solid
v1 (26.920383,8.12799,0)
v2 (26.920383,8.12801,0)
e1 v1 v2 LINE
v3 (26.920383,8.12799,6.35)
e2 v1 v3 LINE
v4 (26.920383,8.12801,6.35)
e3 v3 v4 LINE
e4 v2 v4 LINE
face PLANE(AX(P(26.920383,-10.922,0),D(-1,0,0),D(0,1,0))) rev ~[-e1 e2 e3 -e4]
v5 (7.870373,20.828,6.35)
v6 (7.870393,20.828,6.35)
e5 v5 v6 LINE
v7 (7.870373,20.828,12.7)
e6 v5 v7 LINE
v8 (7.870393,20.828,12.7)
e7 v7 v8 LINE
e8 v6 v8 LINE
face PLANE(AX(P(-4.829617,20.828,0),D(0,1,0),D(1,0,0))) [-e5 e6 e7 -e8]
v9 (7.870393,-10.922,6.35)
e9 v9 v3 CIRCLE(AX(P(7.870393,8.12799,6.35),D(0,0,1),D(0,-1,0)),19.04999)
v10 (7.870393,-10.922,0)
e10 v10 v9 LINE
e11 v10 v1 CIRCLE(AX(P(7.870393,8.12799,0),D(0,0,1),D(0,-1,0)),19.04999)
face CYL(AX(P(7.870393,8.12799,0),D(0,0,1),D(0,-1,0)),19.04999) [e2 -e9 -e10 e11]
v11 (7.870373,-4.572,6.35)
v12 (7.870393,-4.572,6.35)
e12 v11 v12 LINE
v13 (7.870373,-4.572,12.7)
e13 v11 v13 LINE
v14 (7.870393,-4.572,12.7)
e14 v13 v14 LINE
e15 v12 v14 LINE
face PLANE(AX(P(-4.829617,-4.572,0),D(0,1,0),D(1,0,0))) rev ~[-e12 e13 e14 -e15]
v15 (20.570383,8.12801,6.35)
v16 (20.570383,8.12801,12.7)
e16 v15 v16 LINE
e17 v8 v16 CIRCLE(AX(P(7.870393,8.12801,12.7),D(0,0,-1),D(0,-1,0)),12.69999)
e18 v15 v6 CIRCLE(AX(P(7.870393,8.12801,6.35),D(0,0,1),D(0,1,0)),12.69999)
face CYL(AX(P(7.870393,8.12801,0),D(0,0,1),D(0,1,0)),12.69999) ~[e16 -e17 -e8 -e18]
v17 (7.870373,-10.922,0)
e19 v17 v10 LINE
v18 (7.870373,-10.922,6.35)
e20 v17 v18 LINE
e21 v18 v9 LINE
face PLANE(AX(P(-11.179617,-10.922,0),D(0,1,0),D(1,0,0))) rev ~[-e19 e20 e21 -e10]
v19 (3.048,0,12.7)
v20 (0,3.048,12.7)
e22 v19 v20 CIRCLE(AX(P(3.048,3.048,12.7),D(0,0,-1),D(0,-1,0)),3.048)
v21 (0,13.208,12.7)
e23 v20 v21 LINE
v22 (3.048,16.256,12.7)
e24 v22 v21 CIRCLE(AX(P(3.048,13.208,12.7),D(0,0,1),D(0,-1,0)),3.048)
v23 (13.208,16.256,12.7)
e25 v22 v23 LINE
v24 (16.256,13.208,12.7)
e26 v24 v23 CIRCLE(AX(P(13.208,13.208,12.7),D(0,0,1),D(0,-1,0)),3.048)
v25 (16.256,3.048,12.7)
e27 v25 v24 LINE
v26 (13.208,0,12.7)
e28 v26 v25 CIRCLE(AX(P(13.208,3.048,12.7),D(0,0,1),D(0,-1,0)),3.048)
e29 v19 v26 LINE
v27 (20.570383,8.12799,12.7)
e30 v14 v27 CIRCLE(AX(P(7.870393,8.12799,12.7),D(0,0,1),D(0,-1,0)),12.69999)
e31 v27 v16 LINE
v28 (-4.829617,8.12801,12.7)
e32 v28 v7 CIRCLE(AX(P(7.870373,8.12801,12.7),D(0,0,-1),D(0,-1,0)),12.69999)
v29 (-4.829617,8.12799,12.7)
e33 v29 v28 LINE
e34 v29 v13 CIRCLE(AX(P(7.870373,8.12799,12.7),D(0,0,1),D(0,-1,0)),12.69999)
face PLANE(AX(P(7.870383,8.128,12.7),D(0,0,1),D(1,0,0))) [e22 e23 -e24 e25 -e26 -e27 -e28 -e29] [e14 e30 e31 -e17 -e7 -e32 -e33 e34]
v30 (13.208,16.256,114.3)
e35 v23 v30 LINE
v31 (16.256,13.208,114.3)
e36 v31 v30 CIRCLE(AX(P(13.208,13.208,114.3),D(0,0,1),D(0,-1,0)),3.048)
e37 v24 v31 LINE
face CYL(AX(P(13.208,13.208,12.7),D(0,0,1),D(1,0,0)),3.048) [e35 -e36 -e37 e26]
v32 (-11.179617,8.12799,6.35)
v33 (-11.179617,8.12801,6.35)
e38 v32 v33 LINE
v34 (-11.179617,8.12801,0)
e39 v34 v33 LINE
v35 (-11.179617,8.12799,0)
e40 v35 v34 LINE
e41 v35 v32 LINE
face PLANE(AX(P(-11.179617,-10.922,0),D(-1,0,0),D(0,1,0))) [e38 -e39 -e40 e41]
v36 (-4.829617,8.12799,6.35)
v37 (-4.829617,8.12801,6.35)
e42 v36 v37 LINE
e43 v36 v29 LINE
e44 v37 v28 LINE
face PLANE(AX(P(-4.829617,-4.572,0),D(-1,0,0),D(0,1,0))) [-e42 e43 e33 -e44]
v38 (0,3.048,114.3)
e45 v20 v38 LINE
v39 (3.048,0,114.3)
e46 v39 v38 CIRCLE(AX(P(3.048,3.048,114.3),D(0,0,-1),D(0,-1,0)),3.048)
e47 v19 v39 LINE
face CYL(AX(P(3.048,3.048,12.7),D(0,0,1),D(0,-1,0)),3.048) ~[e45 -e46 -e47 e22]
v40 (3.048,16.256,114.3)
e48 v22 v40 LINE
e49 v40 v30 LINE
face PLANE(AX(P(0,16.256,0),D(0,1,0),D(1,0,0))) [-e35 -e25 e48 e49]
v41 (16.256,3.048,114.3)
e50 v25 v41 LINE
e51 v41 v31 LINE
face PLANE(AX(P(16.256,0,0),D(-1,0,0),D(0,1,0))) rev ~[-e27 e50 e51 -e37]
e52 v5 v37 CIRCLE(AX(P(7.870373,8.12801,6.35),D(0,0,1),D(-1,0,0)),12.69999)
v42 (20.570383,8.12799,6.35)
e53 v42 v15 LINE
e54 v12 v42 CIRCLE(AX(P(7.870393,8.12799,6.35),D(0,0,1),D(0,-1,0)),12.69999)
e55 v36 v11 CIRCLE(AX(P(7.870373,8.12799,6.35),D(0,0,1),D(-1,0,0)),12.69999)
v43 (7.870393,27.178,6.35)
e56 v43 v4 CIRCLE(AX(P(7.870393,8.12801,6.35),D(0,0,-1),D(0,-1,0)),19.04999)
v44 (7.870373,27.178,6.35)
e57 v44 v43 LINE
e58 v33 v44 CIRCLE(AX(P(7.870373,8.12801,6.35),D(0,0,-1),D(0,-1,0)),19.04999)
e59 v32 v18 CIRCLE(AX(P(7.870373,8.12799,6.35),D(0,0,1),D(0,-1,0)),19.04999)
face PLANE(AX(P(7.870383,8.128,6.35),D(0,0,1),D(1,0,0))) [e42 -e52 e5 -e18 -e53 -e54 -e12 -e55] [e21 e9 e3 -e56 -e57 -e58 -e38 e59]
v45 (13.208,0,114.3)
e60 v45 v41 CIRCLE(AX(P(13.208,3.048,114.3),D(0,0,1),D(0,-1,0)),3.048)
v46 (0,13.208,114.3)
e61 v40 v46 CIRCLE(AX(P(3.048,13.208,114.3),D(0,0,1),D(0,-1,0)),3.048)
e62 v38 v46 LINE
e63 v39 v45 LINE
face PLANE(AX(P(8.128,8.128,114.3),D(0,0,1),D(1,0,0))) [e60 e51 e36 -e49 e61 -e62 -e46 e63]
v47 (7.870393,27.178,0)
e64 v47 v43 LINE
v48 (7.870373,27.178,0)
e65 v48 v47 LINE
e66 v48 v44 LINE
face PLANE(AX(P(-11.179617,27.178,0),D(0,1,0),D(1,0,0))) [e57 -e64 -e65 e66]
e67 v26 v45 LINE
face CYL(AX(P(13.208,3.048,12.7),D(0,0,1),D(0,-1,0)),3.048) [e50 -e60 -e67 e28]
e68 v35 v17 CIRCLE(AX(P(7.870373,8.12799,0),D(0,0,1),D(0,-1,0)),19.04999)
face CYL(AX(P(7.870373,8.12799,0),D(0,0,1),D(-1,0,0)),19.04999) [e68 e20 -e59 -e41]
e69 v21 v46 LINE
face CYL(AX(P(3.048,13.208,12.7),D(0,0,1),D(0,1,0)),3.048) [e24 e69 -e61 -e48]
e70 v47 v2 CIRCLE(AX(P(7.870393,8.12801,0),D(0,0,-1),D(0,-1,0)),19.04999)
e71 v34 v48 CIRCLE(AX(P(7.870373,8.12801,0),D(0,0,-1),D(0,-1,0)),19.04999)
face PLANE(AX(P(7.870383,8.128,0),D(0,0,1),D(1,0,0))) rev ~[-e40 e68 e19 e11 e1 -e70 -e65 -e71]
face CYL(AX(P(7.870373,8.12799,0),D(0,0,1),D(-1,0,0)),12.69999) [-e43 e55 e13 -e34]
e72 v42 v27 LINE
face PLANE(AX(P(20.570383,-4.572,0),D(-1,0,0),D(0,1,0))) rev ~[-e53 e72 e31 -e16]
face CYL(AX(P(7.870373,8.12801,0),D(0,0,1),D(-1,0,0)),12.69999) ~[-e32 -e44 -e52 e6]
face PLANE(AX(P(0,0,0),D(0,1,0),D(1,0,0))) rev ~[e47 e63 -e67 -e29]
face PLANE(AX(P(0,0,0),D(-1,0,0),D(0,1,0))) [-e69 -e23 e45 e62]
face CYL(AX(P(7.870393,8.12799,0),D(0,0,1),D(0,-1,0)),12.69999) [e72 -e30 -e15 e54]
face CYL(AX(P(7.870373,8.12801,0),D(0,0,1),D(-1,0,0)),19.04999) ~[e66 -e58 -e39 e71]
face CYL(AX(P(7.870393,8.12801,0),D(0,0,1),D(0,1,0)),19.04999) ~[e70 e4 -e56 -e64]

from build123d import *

# Parameters (mm, degrees)
F0_W     = 16.256
F0_H     = 16.256
F1_DEPTH = 114.3
F0_W_2   = 25.4
F0_H_2   = 25.4
F2_DEPTH = 12.7
F3_R     = 3.048
F4_R     = 12.69999
F0_W_3   = 38.1
F0_H_3   = 38.1
F5_DEPTH = 6.35
F6_R     = 19.04999


# Not quite as in the source:
# - a fillet or chamfer is up to 0.001 mm smaller than in the source, because OpenCascade refuses the exact size


with BuildPart() as f1:
    # F0 (on Top) → F1 (new body)
    with BuildSketch(Plane.XY):
        with Locations((8.128, 8.128)):
            Rectangle(F0_W, F0_H)
    extrude(amount=F1_DEPTH)

    # F0 (on Top) → F2 (join)
    with BuildSketch(Plane.XY):
        with Locations((7.8703831056, 8.128)):
            Rectangle(F0_W_2, F0_H_2)
        with Locations((8.128, 8.128)):
            Rectangle(F0_W, F0_H, mode=Mode.SUBTRACT)
    extrude(amount=F2_DEPTH)

    # F3
    f3_edges = [f1.edges().sort_by_distance(p)[0] for p in [
        (0, 16.256, 63.5),
        (16.256, 16.256, 63.5),
        (16.256, 0, 63.5),
        (0, 0, 63.5),
    ]]
    fillet(f3_edges, radius=F3_R)

    # F4 (radius 12.7 in the source; OpenCascade refuses exactly that, so slightly less here)
    f4_edges = [f1.edges().sort_by_distance(p)[0] for p in [
        (-4.829617, 20.828, 6.35),
        (-4.829617, -4.572, 6.35),
        (20.570383, -4.572, 6.35),
        (20.570383, 20.828, 6.35),
    ]]
    fillet(f4_edges, radius=F4_R)

    # F0 (on Top) → F5 (join)
    with BuildSketch(Plane.XY):
        with Locations((7.8703831056, 8.128)):
            Rectangle(F0_W_3, F0_H_3)
        with Locations((7.8703831056, 8.128)):
            Rectangle(F0_W_2, F0_H_2, mode=Mode.SUBTRACT)
        with Locations((7.8703831056, 8.128)):
            Rectangle(F0_W_2, F0_H_2)
        with Locations((8.128, 8.128)):
            Rectangle(F0_W, F0_H, mode=Mode.SUBTRACT)
    extrude(amount=F5_DEPTH)

    # F6 (radius 19.05 in the source; OpenCascade refuses exactly that, so slightly less here)
    f6_edges = [f1.edges().sort_by_distance(p)[0] for p in [
        (-11.179617, 27.178, 3.175),
        (26.920383, 27.178, 3.175),
        (26.920383, -10.922, 3.175),
        (-11.179617, -10.922, 3.175),
    ]]
    fillet(f6_edges, radius=F6_R)


solid = f1.part
